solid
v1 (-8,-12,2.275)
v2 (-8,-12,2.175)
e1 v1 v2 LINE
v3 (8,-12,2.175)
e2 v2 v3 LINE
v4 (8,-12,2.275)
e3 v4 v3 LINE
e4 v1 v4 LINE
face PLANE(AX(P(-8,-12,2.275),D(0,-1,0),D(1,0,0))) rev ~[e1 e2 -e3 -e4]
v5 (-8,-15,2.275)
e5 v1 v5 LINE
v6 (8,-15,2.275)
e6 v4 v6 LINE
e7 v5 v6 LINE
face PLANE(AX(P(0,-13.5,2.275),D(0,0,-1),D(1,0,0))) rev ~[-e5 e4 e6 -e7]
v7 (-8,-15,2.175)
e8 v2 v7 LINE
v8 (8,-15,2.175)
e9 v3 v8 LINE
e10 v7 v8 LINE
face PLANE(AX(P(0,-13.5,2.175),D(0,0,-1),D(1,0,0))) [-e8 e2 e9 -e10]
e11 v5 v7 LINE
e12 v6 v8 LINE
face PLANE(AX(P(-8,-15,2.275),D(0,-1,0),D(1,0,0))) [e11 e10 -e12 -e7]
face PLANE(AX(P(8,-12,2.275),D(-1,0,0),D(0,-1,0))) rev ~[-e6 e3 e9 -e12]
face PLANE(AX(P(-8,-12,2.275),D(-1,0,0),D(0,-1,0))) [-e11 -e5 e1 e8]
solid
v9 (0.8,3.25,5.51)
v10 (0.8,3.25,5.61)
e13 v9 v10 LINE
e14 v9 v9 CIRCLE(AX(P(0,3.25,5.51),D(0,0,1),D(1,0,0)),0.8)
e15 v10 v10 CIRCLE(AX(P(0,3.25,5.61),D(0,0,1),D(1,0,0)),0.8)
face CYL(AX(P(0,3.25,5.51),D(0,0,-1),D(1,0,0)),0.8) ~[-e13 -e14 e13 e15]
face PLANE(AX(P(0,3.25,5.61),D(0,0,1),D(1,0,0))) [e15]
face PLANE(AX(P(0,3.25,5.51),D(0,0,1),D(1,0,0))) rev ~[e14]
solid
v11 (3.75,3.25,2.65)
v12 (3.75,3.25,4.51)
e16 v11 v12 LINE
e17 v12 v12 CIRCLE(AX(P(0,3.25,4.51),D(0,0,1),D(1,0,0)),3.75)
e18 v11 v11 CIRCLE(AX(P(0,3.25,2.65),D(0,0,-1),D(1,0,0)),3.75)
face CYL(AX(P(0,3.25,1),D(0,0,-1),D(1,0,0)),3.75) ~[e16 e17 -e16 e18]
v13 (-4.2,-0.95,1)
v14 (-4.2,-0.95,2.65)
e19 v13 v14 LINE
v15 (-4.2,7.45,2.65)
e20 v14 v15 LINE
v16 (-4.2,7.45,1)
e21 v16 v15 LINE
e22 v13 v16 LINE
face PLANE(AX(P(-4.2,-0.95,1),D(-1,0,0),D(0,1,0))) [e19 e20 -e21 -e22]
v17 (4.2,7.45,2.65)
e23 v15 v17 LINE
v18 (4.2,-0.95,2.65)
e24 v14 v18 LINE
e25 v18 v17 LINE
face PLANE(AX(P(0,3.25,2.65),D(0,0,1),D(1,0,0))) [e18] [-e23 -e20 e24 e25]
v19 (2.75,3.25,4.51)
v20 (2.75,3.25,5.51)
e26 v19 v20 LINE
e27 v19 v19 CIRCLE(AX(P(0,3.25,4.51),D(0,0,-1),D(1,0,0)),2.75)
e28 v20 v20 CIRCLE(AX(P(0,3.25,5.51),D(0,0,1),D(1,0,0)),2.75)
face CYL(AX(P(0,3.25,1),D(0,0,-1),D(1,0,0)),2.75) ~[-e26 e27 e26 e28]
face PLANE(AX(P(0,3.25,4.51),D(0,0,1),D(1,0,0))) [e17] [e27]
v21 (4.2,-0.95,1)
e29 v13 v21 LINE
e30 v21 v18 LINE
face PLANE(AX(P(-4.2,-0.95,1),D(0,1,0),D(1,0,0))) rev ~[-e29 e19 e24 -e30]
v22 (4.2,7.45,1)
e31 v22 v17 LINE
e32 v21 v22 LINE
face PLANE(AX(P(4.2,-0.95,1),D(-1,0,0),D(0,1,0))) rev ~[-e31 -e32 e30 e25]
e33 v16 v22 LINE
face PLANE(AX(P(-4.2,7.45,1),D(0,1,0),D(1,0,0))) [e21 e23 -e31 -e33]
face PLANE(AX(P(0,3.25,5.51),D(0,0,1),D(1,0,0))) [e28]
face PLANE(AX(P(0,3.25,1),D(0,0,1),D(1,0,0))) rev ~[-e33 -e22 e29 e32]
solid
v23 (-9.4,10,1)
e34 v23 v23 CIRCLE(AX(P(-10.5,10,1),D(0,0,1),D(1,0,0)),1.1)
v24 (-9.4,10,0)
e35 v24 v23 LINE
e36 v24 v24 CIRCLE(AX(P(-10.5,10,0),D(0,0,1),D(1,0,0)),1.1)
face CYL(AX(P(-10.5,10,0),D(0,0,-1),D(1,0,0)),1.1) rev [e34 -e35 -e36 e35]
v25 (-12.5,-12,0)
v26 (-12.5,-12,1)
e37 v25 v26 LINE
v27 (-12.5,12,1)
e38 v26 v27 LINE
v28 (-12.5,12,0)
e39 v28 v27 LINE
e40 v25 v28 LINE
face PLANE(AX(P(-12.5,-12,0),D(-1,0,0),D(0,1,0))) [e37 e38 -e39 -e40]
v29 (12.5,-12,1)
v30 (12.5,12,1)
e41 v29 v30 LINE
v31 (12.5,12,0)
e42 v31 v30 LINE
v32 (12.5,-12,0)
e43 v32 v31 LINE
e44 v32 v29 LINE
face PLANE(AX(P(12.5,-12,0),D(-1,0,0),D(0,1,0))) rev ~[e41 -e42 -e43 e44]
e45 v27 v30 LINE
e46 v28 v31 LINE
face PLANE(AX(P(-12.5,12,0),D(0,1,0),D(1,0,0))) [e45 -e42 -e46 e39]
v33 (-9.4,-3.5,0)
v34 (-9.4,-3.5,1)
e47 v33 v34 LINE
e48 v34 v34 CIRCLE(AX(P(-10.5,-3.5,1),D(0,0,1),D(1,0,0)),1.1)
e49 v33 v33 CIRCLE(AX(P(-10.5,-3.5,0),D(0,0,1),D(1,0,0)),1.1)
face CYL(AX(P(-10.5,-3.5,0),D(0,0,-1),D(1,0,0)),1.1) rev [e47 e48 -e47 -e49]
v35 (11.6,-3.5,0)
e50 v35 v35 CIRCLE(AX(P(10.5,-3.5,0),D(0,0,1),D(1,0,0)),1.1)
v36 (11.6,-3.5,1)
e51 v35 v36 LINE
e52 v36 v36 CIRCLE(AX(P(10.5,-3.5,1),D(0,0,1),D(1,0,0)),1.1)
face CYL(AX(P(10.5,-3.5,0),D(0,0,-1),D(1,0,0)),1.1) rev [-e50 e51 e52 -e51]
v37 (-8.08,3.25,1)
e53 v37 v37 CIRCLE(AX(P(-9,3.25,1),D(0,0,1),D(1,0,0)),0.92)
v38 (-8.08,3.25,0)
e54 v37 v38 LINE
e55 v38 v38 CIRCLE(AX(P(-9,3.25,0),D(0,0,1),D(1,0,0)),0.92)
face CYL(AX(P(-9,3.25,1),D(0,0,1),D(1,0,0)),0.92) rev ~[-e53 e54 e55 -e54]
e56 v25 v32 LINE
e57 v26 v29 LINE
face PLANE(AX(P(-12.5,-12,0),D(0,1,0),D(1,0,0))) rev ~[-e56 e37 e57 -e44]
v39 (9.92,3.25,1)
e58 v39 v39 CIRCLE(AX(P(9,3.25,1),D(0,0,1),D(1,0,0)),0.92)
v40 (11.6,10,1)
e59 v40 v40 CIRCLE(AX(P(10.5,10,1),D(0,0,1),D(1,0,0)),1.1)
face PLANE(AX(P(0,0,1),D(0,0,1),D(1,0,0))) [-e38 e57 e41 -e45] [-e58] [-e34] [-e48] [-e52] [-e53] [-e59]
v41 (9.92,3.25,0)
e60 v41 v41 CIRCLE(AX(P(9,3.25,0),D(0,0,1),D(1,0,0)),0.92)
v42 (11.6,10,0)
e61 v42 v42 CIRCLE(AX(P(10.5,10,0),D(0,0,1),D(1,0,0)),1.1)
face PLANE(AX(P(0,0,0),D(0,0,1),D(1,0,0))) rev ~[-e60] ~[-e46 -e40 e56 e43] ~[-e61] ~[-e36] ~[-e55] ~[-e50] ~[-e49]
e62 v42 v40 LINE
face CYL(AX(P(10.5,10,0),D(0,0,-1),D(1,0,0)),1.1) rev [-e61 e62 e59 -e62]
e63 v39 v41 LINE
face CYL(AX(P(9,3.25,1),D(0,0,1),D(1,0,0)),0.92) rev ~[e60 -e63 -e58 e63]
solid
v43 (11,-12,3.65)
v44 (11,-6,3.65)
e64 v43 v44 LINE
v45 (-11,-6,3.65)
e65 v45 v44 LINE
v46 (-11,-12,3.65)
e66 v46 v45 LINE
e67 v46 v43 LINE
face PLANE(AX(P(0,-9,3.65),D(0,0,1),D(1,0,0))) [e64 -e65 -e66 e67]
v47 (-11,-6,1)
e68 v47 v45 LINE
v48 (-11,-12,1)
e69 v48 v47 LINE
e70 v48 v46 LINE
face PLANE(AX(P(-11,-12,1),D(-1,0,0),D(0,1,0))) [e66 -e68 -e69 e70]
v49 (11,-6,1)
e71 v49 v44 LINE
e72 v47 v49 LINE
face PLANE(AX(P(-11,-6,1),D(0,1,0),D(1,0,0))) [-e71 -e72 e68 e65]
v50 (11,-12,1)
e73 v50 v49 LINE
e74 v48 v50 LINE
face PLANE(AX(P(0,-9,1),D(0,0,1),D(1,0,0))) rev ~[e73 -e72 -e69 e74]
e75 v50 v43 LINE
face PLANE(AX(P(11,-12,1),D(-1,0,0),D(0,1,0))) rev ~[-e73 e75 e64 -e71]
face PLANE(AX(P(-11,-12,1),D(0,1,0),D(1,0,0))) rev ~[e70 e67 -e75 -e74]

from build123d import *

# Parameters (mm, degrees)
F0_W      = 25
F0_H      = 24
F0_R      = 1.1
F1_DEPTH  = 1
F2_R      = 0.92
F3_DEPTH  = 1
F2_W      = 8.4
F2_H      = 8.4
F2_R_2    = 3.75
F2_R_3    = 2.75
F4_DEPTH  = 1.65
F5_DEPTH  = 3.51
F6_DEPTH  = 4.51
F7_R      = 0.8
F8_DEPTH  = 0.1
F9_W      = 22
F9_H      = 6
F10_DEPTH = 2.65
F12_W     = 16
F12_H     = 3
F13_DEPTH = 0.1


with BuildPart() as f1:
    # F0 (on Top) → F1 (new body)
    with BuildSketch(Plane.XY):
        Rectangle(F0_W, F0_H)
        with Locations((-10.5, -3.5)):
            Circle(F0_R, mode=Mode.SUBTRACT)
        with Locations((10.5, -3.5)):
            Circle(F0_R, mode=Mode.SUBTRACT)
        with Locations((-10.5, 10)):
            Circle(F0_R, mode=Mode.SUBTRACT)
        with Locations((10.5, 10)):
            Circle(F0_R, mode=Mode.SUBTRACT)
    extrude(amount=F1_DEPTH)

    # F2 (on face) → F3 (cut, through all)
    with BuildSketch(Plane.XY.offset(1)):
        with Locations((-9, 3.25)):
            Circle(F2_R)
        with Locations((9, 3.25)):
            Circle(F2_R)
    extrude(amount=-F3_DEPTH, mode=Mode.SUBTRACT)


with BuildPart() as f4:
    # F2 (on face) → F4 (new body)
    with BuildSketch(Plane.XY.offset(1)):
        with Locations((0, 3.25)):
            Rectangle(F2_W, F2_H)
        with Locations((0, 3.25)):
            Circle(F2_R_2, mode=Mode.SUBTRACT)
        with Locations((0, 3.25)):
            Circle(F2_R_2)
        with Locations((0, 3.25)):
            Circle(F2_R_3, mode=Mode.SUBTRACT)
        with Locations((0, 3.25)):
            Circle(F2_R_3)
    extrude(amount=F4_DEPTH)

    # F2 (on face) → F5 (join)
    with BuildSketch(Plane.XY.offset(1)):
        with Locations((0, 3.25)):
            Circle(F2_R_2)
        with Locations((0, 3.25)):
            Circle(F2_R_3, mode=Mode.SUBTRACT)
        with Locations((0, 3.25)):
            Circle(F2_R_3)
    extrude(amount=F5_DEPTH)

    # F2 (on face) → F6 (join)
    with BuildSketch(Plane.XY.offset(1)):
        with Locations((0, 3.25)):
            Circle(F2_R_3)
    extrude(amount=F6_DEPTH)


with BuildPart() as f8:
    # F7 (on face) → F8 (new body)
    with BuildSketch(Plane.XY.offset(5.51)):
        with Locations((0, 3.25)):
            Circle(F7_R)
    extrude(amount=F8_DEPTH)


with BuildPart() as f10:
    # F9 (on face) → F10 (new body)
    with BuildSketch(Plane.XY.offset(1)):
        with Locations((0, -9)):
            Rectangle(F9_W, F9_H)
    extrude(amount=F10_DEPTH)


with BuildPart() as f13:
    # F12 (on offset) → F13 (new body)
    with BuildSketch(Plane(origin=(0, 0, 2.275), x_dir=(1, 0, 0), z_dir=(0, 0, -1))):
        with Locations((0, 13.5)):
            Rectangle(F12_W, F12_H)
    extrude(amount=F13_DEPTH)


solid = Compound([f1.part, f4.part, f8.part, f10.part, f13.part])
